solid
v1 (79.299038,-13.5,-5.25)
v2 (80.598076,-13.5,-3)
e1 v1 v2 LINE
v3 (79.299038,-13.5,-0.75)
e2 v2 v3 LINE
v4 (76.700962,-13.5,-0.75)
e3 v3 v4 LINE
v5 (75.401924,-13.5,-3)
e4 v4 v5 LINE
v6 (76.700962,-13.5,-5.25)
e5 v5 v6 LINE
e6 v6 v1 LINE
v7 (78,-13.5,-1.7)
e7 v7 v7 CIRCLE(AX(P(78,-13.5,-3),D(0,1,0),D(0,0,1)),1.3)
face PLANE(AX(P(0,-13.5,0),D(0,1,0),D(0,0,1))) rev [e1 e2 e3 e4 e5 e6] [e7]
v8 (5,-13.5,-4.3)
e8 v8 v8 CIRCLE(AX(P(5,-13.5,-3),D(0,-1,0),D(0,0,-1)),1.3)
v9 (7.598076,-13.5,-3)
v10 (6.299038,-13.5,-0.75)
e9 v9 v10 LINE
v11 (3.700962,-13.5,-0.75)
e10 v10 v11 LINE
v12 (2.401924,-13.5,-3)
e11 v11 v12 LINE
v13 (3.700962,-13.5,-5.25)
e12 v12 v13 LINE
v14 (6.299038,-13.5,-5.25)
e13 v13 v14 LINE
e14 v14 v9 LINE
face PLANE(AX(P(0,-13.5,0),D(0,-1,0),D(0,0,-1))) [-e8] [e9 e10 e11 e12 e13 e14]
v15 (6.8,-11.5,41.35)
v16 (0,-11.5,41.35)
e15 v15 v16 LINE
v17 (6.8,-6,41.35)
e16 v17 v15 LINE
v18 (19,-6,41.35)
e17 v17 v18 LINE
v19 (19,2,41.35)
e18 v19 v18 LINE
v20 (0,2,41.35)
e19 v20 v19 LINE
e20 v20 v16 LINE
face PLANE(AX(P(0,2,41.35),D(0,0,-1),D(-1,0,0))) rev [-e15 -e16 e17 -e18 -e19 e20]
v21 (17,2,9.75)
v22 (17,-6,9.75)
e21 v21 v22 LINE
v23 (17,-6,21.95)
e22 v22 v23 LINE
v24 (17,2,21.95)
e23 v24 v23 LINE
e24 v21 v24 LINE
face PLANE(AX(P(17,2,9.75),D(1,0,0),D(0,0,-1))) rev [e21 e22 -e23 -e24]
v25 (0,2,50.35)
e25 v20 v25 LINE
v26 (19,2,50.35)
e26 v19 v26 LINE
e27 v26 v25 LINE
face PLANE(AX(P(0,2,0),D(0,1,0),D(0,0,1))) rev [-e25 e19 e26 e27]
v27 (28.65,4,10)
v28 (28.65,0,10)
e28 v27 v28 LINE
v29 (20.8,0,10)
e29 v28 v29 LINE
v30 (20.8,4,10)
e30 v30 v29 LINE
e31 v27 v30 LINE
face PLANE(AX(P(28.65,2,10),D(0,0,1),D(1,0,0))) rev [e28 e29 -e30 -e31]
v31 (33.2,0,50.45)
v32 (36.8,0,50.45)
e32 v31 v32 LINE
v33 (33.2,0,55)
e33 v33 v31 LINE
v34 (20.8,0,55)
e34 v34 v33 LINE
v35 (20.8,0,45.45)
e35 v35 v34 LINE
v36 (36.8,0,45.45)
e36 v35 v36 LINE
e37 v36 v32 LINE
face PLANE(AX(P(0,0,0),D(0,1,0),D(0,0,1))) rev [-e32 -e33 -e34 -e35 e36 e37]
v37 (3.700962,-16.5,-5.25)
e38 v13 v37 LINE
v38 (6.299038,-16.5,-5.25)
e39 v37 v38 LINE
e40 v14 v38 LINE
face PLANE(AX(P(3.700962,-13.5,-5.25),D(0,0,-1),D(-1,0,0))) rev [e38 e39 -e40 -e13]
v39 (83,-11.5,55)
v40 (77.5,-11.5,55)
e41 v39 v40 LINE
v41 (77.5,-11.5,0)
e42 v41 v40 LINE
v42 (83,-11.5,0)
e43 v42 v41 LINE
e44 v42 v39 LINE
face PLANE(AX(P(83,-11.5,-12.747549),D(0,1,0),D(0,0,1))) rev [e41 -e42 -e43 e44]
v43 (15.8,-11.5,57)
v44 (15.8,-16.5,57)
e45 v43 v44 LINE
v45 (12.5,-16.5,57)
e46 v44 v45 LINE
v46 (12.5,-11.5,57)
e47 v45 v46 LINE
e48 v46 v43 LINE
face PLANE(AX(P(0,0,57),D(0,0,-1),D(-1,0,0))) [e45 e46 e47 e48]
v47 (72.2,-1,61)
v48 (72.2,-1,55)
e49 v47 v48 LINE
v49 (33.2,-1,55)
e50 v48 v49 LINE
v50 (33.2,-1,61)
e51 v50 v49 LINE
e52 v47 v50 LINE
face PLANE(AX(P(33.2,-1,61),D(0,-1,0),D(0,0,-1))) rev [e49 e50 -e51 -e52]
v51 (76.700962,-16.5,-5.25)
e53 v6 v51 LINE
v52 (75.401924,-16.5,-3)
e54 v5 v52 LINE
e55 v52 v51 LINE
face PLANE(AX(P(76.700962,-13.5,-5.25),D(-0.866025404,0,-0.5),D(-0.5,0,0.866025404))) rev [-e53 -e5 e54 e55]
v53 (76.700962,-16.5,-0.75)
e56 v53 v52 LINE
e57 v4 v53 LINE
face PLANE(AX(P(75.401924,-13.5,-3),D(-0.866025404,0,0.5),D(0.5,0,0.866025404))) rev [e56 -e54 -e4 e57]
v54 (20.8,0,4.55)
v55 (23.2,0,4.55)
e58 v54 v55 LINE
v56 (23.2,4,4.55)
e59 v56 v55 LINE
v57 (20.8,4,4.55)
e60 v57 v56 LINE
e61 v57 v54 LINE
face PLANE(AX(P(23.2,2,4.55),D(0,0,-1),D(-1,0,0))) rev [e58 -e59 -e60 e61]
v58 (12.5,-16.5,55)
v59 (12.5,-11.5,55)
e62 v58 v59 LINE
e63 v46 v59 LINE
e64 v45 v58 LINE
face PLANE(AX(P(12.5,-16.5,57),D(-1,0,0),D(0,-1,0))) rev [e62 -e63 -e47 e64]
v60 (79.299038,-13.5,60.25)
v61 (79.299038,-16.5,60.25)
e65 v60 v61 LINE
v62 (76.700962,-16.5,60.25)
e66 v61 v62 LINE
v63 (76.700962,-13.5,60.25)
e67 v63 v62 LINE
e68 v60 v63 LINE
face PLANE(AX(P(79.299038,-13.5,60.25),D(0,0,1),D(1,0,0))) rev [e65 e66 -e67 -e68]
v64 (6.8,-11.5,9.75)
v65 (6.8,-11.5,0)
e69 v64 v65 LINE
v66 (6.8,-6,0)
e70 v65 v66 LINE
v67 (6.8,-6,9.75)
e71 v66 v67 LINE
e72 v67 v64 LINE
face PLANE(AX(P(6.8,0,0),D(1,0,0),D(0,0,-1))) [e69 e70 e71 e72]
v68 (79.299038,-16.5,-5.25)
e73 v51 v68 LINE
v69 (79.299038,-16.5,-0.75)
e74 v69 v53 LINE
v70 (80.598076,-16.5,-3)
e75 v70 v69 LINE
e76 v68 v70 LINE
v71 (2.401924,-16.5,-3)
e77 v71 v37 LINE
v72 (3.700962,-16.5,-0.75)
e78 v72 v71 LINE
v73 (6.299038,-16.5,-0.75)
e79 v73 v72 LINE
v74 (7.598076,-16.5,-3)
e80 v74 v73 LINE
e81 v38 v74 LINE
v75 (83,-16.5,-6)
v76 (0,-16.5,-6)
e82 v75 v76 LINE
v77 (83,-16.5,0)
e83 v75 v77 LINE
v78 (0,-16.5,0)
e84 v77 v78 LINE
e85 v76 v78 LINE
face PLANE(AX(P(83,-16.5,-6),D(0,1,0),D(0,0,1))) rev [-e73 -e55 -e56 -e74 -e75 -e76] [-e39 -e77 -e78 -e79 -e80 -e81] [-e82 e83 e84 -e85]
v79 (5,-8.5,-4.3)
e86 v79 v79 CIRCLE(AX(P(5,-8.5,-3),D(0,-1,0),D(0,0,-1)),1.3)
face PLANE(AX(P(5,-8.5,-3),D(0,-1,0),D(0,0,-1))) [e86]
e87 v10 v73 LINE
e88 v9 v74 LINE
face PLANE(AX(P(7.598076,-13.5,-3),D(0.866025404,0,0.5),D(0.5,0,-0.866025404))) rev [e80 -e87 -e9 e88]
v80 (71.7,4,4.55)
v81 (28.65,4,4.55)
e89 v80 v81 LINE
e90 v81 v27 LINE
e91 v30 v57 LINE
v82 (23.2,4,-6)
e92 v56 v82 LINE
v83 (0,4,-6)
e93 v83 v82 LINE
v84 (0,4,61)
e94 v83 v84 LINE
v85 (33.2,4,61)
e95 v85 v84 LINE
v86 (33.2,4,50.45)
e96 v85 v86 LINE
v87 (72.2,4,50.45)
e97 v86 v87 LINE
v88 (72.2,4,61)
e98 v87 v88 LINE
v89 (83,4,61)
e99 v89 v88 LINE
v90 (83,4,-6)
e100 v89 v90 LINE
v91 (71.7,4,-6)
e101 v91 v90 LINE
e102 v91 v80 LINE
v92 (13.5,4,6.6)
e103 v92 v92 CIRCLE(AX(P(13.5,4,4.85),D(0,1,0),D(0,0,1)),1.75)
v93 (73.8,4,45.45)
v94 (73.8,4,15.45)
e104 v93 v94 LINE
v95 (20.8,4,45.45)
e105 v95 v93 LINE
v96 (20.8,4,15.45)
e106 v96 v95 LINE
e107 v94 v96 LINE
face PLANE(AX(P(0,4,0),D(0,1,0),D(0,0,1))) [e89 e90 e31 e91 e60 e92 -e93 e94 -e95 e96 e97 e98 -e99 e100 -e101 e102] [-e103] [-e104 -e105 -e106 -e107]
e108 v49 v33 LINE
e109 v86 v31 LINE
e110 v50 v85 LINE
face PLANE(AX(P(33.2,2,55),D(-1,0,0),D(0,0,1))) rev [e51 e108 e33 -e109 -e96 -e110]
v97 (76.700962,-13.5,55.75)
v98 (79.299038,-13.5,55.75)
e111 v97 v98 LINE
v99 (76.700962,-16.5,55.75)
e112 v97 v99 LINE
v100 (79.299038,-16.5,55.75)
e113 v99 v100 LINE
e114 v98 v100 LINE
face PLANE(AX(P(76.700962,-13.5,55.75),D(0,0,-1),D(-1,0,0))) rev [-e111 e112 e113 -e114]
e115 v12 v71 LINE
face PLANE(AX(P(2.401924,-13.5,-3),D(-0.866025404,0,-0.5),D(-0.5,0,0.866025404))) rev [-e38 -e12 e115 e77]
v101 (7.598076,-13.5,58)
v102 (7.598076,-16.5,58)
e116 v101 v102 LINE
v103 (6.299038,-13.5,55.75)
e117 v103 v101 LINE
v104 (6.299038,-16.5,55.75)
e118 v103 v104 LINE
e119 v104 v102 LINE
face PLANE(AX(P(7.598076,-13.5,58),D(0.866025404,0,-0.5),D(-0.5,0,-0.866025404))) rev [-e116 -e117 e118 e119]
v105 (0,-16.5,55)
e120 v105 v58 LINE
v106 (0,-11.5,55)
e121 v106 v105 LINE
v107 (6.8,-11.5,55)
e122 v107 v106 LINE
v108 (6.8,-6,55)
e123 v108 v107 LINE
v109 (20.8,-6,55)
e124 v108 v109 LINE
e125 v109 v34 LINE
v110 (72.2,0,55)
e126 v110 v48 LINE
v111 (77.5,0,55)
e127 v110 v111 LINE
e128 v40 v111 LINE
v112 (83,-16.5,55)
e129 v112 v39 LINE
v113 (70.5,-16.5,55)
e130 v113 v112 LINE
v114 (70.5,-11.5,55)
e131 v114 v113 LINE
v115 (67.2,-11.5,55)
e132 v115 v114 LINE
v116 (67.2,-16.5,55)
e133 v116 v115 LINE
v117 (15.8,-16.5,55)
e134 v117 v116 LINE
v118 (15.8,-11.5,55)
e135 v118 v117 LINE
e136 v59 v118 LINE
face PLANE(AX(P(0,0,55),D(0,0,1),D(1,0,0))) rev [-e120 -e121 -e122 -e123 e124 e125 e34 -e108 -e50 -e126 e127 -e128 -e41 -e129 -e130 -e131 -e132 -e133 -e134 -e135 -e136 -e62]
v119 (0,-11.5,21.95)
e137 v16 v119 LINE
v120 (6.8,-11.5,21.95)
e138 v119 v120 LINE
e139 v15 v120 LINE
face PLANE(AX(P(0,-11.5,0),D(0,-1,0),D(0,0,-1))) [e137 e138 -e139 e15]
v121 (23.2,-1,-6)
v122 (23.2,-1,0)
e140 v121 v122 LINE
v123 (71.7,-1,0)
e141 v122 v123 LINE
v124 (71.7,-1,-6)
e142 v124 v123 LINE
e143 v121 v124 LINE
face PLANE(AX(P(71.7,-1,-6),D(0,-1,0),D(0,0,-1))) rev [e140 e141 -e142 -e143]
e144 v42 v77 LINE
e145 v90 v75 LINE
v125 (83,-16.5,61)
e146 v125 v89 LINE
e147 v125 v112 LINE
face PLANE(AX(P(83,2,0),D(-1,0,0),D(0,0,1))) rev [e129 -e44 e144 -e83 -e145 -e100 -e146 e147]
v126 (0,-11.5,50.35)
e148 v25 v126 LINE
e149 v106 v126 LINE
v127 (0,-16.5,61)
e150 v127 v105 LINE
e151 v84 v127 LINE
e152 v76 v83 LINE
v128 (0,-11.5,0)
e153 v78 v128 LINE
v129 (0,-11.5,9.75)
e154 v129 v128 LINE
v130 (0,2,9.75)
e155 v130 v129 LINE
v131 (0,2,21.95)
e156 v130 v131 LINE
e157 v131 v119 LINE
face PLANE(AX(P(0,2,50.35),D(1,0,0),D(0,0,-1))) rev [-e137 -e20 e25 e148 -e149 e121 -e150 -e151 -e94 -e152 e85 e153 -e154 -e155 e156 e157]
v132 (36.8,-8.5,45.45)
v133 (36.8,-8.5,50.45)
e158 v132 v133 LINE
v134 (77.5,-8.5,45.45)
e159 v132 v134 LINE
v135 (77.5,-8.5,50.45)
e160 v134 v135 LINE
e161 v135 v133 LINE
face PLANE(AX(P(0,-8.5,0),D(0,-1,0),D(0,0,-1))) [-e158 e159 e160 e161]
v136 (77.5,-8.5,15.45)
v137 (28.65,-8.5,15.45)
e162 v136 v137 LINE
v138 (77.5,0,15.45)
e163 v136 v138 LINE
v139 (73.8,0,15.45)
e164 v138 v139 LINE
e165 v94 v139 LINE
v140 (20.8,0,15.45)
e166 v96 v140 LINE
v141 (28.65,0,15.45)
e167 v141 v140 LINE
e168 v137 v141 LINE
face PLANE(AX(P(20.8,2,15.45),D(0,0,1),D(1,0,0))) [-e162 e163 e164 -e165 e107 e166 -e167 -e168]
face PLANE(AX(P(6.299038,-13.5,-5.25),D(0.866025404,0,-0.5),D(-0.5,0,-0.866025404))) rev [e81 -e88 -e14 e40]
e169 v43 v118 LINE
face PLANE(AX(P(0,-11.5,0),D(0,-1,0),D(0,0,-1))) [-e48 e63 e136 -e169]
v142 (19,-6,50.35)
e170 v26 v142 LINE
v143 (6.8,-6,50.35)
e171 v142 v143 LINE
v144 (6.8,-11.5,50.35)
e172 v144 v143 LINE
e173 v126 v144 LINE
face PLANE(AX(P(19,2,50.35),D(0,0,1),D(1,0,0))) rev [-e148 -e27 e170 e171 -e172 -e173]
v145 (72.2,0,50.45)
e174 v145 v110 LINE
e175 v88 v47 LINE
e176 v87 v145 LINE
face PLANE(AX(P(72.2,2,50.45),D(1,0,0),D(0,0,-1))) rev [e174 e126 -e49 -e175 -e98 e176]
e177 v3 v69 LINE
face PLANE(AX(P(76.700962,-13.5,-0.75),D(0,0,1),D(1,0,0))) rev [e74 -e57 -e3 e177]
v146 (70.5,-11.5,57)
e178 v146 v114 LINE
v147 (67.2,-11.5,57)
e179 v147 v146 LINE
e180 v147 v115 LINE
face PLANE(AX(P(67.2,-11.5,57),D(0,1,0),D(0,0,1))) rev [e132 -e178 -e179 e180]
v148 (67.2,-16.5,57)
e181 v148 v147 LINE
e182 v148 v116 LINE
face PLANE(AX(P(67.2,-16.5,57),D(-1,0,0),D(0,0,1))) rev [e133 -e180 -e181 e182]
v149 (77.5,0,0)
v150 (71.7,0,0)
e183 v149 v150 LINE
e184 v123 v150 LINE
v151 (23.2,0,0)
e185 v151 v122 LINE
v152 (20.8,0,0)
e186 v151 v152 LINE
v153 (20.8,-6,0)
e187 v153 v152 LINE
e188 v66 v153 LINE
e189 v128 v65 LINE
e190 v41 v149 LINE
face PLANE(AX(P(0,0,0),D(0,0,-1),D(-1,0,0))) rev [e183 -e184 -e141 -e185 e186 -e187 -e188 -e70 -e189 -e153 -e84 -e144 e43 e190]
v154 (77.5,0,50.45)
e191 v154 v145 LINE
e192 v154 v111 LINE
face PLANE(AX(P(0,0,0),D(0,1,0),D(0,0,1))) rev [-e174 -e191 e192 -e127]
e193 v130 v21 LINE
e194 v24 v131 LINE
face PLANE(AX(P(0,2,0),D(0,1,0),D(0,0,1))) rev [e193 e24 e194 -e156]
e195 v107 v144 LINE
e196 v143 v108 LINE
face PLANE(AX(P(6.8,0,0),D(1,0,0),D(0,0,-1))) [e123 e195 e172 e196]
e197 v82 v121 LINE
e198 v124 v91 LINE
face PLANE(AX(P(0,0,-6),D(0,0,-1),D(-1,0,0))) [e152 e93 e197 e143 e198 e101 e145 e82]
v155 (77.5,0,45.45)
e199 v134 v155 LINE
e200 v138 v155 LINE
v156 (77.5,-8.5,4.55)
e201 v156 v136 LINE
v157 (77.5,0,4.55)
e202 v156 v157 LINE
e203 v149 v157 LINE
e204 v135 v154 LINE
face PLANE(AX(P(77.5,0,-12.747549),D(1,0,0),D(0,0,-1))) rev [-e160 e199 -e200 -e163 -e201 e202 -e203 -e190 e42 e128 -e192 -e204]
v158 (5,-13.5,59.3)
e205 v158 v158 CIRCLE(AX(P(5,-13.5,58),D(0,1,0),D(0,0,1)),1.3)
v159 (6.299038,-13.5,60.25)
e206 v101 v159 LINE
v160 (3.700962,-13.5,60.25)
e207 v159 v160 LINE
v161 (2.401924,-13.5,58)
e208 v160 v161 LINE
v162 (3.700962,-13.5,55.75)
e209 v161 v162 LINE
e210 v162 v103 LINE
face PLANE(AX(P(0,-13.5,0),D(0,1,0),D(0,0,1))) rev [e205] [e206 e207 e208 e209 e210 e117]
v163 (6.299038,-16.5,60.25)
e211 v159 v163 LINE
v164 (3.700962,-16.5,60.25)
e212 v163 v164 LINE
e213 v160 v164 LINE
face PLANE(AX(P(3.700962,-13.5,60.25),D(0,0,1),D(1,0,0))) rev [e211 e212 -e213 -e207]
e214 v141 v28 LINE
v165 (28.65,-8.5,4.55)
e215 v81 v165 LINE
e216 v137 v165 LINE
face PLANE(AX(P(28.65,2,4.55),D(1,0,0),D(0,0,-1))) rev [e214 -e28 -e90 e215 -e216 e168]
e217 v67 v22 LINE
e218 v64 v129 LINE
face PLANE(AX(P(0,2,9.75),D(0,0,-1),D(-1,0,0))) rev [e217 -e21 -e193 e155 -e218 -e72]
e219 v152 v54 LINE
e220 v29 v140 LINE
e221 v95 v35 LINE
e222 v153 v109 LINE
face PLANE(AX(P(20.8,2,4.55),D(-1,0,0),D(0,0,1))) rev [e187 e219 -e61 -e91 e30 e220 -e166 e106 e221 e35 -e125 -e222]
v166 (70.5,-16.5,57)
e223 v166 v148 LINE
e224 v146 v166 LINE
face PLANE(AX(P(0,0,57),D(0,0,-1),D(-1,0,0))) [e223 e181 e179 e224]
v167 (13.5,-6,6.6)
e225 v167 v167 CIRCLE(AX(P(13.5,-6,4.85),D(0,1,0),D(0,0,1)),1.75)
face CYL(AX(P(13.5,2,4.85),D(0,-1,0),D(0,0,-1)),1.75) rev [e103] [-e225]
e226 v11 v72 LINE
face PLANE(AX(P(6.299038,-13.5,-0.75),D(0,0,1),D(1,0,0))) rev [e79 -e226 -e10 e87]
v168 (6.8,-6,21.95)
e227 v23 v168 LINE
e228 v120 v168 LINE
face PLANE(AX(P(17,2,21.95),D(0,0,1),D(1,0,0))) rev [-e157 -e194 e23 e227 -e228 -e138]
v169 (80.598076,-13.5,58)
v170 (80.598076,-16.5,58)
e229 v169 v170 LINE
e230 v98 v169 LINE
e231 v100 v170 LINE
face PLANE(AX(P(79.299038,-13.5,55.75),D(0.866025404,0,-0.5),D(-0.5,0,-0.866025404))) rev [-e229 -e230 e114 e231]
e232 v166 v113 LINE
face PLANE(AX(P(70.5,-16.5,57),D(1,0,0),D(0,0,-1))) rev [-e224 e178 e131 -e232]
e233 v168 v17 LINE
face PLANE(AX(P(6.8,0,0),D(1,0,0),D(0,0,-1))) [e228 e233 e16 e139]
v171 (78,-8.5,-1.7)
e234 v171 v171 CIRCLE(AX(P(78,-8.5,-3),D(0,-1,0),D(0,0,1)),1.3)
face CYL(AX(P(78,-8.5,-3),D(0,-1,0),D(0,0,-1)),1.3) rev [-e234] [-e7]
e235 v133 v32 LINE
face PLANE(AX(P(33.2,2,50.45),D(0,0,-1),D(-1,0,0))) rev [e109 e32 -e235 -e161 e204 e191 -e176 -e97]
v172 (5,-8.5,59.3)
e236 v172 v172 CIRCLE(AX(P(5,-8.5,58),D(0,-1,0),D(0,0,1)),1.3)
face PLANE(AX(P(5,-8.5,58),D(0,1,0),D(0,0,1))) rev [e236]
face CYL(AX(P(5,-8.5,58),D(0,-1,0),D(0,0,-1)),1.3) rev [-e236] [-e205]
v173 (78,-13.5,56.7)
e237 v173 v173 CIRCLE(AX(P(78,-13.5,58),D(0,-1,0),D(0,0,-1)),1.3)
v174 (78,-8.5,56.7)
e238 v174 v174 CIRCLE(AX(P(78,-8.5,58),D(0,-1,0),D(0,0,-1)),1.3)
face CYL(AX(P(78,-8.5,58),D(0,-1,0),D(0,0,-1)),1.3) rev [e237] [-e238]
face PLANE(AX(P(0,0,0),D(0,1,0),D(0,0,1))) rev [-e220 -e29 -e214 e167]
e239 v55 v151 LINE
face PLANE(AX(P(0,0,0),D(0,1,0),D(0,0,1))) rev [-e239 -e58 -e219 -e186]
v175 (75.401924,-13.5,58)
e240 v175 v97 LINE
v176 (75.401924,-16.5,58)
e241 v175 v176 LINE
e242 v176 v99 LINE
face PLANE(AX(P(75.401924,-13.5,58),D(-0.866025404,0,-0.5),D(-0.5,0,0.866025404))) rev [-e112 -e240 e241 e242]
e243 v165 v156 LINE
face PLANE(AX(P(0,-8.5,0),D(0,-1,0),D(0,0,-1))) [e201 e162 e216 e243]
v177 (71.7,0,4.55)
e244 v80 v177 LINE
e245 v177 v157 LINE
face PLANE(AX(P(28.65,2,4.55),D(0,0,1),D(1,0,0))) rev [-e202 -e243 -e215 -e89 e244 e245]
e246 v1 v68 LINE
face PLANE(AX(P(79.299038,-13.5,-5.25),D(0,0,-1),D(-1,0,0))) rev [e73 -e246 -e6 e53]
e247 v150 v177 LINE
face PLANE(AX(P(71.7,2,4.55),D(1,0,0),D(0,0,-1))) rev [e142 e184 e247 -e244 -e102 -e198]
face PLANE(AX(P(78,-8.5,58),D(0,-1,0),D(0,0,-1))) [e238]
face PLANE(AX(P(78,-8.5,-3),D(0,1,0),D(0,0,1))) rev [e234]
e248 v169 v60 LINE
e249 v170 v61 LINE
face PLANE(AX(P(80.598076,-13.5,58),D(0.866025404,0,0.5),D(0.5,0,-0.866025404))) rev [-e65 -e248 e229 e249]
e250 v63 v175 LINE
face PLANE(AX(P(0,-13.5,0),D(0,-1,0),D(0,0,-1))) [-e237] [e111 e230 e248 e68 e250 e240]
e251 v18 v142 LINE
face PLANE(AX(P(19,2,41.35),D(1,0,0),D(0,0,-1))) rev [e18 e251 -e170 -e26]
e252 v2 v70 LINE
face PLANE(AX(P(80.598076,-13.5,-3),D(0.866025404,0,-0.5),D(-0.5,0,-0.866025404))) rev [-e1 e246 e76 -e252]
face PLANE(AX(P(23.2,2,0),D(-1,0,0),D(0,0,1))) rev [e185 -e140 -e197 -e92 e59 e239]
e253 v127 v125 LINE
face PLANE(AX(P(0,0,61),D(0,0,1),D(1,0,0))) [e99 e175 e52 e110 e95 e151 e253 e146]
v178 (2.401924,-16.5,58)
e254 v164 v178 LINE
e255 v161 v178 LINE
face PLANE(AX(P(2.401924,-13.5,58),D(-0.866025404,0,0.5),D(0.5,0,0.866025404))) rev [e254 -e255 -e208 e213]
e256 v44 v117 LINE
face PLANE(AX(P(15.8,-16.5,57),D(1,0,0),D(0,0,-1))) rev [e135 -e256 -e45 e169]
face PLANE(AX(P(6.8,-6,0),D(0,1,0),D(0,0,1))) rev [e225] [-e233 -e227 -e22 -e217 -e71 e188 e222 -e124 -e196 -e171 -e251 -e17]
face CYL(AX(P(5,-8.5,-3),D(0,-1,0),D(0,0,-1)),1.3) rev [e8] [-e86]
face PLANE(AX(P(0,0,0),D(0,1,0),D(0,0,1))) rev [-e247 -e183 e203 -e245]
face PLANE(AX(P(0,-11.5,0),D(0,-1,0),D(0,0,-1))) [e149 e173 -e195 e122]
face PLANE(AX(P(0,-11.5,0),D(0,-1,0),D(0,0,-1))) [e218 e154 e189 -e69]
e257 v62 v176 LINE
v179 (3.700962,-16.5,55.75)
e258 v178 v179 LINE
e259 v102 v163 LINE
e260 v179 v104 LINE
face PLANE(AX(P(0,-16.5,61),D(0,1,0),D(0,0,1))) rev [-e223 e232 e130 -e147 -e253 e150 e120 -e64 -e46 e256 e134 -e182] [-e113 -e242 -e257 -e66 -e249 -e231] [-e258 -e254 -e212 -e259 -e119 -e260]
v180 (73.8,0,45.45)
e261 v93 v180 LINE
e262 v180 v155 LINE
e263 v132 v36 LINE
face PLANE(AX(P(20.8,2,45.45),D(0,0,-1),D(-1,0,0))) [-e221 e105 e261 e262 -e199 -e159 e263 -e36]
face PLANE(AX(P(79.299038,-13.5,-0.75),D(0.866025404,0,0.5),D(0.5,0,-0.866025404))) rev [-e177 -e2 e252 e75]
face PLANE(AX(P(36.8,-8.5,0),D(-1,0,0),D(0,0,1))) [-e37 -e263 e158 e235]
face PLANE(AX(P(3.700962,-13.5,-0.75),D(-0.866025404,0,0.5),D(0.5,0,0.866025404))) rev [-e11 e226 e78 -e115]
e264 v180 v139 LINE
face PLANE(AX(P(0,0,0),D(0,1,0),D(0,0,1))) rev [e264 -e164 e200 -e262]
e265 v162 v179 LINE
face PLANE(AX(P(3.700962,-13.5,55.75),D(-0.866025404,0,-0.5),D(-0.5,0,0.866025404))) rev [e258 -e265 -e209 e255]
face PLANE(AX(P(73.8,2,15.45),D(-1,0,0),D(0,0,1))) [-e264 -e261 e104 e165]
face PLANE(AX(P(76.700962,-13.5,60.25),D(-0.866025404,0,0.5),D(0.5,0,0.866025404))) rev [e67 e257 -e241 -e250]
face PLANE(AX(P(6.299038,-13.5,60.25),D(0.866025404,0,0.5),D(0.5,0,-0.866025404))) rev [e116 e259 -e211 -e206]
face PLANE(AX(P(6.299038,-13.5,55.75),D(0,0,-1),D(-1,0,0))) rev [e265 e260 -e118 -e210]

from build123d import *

# Parameters (mm, degrees)
SKETCH1_R               = 1.75
SKETCH1_W               = 53
SKETCH1_H               = 30
BOSS_EXTRUDE1_DEPTH     = 2
BOSS_EXTRUDE2_OUTLINE_R = 1.75
BOSS_EXTRUDE2_DEPTH     = 11.5
SKETCH3_R               = 1.75
SKETCH3_W               = 53
SKETCH3_H               = 30
BOSS_EXTRUDE3_DEPTH     = 2
BOSS_EXTRUDE4_DEPTH     = 6
BOSS_EXTRUDE5_DEPTH     = 6
SKETCH7_W               = 3.3
SKETCH7_H               = 5
CUT_EXTRUDE3_DEPTH      = 2
SKETCH9_W               = 55
SKETCH9_H               = 5.5
CUT_EXTRUDE5_DEPTH      = 14
SKETCH10_W              = 5.5
SKETCH10_H              = 11.5
BOSS_EXTRUDE6_DEPTH     = 55
BOSS_EXTRUDE8_DEPTH     = 8.5
CUT_EXTRUDE6_DEPTH      = 3
SKETCH15_R              = 1.3
CUT_EXTRUDE7_DEPTH      = 8


# Read off the part's stored shape, not the designer's step: Boss-Extrude2
with BuildPart() as part:
    # Sketch1 → Boss-Extrude1 (new body)
    with BuildSketch(Plane(origin=(0, 0, 0), x_dir=(1, 0, 0), z_dir=(0, 1, 0))):
        Polygon((0, 0), (23.2, 0), (23.2, -4.55), (20.8, -4.55), (20.8, -10), (28.65, -10), (28.65, -4.55), (71.7, -4.55), (71.7, 0), (83, 0), (83, -22.35), (83, -30.15), (83, -55), (72.2, -55), (72.2, -50.45), (33.2, -50.45), (33.2, -55), (0, -55), (0, -50.35), (19, -50.35), (19, -41.35), (0, -41.35), (0, -21.95), (17, -21.95), (17, -9.75), (0, -9.75), align=None)
        with Locations(Location((13.5, -4.85, 0), (0, 0, 270))):
            Circle(SKETCH1_R, mode=Mode.SUBTRACT)
        with Locations((47.3, -30.45)):
            Rectangle(SKETCH1_W, SKETCH1_H, mode=Mode.SUBTRACT)
    extrude(amount=BOSS_EXTRUDE1_DEPTH)

    # Boss-Extrude2 outline → Boss-Extrude2 (add)
    with BuildSketch(Plane.XZ):
        Polygon((0, 9.75), (0, 0), (20.8, 0), (20.8, 55), (0, 55), (0, 50.35), (19, 50.35), (19, 41.35), (0, 41.35), (0, 21.95), (17, 21.95), (17, 9.75), align=None)
        with Locations((13.5, 4.85)):
            Circle(BOSS_EXTRUDE2_OUTLINE_R, mode=Mode.SUBTRACT)
    extrude(amount=BOSS_EXTRUDE2_DEPTH)

    # Sketch3 → Boss-Extrude3 (add)
    with BuildSketch(Plane(origin=(0, 2, 0), x_dir=(1, 0, 0), z_dir=(0, 1, 0))):
        Polygon((23.2, 0), (0, 0), (0, -55), (33.2, -55), (33.2, -50.45), (72.2, -50.45), (72.2, -55), (83, -55), (83, 0), (71.7, 0), (71.7, -4.55), (28.65, -4.55), (28.65, -10), (20.8, -10), (20.8, -4.55), (23.2, -4.55), align=None)
        with Locations(Location((13.5, -4.85, 0), (0, 0, 90))):
            Circle(SKETCH3_R, mode=Mode.SUBTRACT)
        with Locations((47.3, -30.45)):
            Rectangle(SKETCH3_W, SKETCH3_H, mode=Mode.SUBTRACT)
    extrude(amount=BOSS_EXTRUDE3_DEPTH)

    # Sketch4 → Boss-Extrude4 (add)
    with BuildSketch(Plane.XY.offset(55)):
        Polygon((0, 4), (33.2, 4), (33.2, 0), (33.2, -1), (72.2, -1), (72.2, 0), (72.2, 4), (83, 4), (83, -11.5), (83, -16.5), (0, -16.5), (0, -11.5), align=None)
    extrude(amount=BOSS_EXTRUDE4_DEPTH)

    # Sketch5 → Boss-Extrude5 (add)
    with BuildSketch(Plane(origin=(0, 0, 0), x_dir=(-1, 0, 0), z_dir=(0, 0, -1))):
        Polygon((-23.2, 4), (-23.2, 0), (-23.2, -1), (-71.7, -1), (-71.7, 0), (-71.7, 4), (-83, 4), (-83, -11.5), (-83, -16.5), (0, -16.5), (0, -11.5), (0, 4), align=None)
    extrude(amount=BOSS_EXTRUDE5_DEPTH)

    # Sketch7 → Cut-Extrude3 (cut)
    with BuildSketch(Plane(origin=(0, 0, 55), x_dir=(-1, 0, 0), z_dir=(0, 0, -1))):
        with Locations((-14.15, -14)):
            Rectangle(SKETCH7_W, SKETCH7_H)
        with Locations((-68.85, -14)):
            Rectangle(SKETCH7_W, SKETCH7_H)
    extrude(amount=-CUT_EXTRUDE3_DEPTH, mode=Mode.SUBTRACT)

    # Sketch9 → Cut-Extrude5 (cut)
    with BuildSketch(Plane(origin=(20.8, 0, 0), x_dir=(0, 0, -1), z_dir=(1, 0, 0))):
        with Locations((-27.5, -8.75)):
            Rectangle(SKETCH9_W, SKETCH9_H)
    extrude(amount=-CUT_EXTRUDE5_DEPTH, mode=Mode.SUBTRACT)

    # Sketch10 → Boss-Extrude6 (add)
    with BuildSketch(Plane(origin=(0, 0, 55), x_dir=(-1, 0, 0), z_dir=(0, 0, -1))):
        with Locations((-80.25, -5.75)):
            Rectangle(SKETCH10_W, SKETCH10_H)
    extrude(amount=BOSS_EXTRUDE6_DEPTH)

    # Sketch12 → Boss-Extrude8 (add)
    with BuildSketch(Plane.XZ):
        Polygon((73.8, 45.45), (77.5, 45.45), (77.5, 50.45), (72.2, 50.45), (36.8, 50.45), (36.8, 45.45), align=None)
        Polygon((28.65, 10), (28.65, 4.55), (71.7, 4.55), (77.5, 4.55), (77.5, 15.45), (73.8, 15.45), (28.65, 15.45), align=None)
    extrude(amount=BOSS_EXTRUDE8_DEPTH)

    # Sketch14 → Cut-Extrude6 (cut)
    with BuildSketch(Plane.XZ.offset(16.5)):
        Polygon((79.299038106, 55.75), (80.598076211, 58), (79.299038106, 60.25), (76.700961894, 60.25), (75.401923789, 58), (76.700961894, 55.75), align=None)
        Polygon((6.299038106, 55.75), (3.700961894, 55.75), (2.401923789, 58), (3.700961894, 60.25), (6.299038106, 60.25), (7.598076211, 58), align=None)
        Polygon((3.700961894, -0.75), (2.401923789, -3), (3.700961894, -5.25), (6.299038106, -5.25), (7.598076211, -3), (6.299038106, -0.75), align=None)
        Polygon((76.700961894, -0.75), (79.299038106, -0.75), (80.598076211, -3), (79.299038106, -5.25), (76.700961894, -5.25), (75.401923789, -3), align=None)
    extrude(amount=-CUT_EXTRUDE6_DEPTH, mode=Mode.SUBTRACT)

    # Sketch15 → Cut-Extrude7 (cut)
    with BuildSketch(Plane.XZ.offset(16.5)):
        with Locations(Location((78, 58, 0), (0, 0, 270))):
            Circle(SKETCH15_R)
        with Locations(Location((5, 58, 0), (0, 0, 90))):
            Circle(SKETCH15_R)
        with Locations(Location((78, -3, 0), (0, 0, 90))):
            Circle(SKETCH15_R)
        with Locations(Location((5, -3, 0), (0, 0, 270))):
            Circle(SKETCH15_R)
    extrude(amount=-CUT_EXTRUDE7_DEPTH, mode=Mode.SUBTRACT)


solid = part.part
